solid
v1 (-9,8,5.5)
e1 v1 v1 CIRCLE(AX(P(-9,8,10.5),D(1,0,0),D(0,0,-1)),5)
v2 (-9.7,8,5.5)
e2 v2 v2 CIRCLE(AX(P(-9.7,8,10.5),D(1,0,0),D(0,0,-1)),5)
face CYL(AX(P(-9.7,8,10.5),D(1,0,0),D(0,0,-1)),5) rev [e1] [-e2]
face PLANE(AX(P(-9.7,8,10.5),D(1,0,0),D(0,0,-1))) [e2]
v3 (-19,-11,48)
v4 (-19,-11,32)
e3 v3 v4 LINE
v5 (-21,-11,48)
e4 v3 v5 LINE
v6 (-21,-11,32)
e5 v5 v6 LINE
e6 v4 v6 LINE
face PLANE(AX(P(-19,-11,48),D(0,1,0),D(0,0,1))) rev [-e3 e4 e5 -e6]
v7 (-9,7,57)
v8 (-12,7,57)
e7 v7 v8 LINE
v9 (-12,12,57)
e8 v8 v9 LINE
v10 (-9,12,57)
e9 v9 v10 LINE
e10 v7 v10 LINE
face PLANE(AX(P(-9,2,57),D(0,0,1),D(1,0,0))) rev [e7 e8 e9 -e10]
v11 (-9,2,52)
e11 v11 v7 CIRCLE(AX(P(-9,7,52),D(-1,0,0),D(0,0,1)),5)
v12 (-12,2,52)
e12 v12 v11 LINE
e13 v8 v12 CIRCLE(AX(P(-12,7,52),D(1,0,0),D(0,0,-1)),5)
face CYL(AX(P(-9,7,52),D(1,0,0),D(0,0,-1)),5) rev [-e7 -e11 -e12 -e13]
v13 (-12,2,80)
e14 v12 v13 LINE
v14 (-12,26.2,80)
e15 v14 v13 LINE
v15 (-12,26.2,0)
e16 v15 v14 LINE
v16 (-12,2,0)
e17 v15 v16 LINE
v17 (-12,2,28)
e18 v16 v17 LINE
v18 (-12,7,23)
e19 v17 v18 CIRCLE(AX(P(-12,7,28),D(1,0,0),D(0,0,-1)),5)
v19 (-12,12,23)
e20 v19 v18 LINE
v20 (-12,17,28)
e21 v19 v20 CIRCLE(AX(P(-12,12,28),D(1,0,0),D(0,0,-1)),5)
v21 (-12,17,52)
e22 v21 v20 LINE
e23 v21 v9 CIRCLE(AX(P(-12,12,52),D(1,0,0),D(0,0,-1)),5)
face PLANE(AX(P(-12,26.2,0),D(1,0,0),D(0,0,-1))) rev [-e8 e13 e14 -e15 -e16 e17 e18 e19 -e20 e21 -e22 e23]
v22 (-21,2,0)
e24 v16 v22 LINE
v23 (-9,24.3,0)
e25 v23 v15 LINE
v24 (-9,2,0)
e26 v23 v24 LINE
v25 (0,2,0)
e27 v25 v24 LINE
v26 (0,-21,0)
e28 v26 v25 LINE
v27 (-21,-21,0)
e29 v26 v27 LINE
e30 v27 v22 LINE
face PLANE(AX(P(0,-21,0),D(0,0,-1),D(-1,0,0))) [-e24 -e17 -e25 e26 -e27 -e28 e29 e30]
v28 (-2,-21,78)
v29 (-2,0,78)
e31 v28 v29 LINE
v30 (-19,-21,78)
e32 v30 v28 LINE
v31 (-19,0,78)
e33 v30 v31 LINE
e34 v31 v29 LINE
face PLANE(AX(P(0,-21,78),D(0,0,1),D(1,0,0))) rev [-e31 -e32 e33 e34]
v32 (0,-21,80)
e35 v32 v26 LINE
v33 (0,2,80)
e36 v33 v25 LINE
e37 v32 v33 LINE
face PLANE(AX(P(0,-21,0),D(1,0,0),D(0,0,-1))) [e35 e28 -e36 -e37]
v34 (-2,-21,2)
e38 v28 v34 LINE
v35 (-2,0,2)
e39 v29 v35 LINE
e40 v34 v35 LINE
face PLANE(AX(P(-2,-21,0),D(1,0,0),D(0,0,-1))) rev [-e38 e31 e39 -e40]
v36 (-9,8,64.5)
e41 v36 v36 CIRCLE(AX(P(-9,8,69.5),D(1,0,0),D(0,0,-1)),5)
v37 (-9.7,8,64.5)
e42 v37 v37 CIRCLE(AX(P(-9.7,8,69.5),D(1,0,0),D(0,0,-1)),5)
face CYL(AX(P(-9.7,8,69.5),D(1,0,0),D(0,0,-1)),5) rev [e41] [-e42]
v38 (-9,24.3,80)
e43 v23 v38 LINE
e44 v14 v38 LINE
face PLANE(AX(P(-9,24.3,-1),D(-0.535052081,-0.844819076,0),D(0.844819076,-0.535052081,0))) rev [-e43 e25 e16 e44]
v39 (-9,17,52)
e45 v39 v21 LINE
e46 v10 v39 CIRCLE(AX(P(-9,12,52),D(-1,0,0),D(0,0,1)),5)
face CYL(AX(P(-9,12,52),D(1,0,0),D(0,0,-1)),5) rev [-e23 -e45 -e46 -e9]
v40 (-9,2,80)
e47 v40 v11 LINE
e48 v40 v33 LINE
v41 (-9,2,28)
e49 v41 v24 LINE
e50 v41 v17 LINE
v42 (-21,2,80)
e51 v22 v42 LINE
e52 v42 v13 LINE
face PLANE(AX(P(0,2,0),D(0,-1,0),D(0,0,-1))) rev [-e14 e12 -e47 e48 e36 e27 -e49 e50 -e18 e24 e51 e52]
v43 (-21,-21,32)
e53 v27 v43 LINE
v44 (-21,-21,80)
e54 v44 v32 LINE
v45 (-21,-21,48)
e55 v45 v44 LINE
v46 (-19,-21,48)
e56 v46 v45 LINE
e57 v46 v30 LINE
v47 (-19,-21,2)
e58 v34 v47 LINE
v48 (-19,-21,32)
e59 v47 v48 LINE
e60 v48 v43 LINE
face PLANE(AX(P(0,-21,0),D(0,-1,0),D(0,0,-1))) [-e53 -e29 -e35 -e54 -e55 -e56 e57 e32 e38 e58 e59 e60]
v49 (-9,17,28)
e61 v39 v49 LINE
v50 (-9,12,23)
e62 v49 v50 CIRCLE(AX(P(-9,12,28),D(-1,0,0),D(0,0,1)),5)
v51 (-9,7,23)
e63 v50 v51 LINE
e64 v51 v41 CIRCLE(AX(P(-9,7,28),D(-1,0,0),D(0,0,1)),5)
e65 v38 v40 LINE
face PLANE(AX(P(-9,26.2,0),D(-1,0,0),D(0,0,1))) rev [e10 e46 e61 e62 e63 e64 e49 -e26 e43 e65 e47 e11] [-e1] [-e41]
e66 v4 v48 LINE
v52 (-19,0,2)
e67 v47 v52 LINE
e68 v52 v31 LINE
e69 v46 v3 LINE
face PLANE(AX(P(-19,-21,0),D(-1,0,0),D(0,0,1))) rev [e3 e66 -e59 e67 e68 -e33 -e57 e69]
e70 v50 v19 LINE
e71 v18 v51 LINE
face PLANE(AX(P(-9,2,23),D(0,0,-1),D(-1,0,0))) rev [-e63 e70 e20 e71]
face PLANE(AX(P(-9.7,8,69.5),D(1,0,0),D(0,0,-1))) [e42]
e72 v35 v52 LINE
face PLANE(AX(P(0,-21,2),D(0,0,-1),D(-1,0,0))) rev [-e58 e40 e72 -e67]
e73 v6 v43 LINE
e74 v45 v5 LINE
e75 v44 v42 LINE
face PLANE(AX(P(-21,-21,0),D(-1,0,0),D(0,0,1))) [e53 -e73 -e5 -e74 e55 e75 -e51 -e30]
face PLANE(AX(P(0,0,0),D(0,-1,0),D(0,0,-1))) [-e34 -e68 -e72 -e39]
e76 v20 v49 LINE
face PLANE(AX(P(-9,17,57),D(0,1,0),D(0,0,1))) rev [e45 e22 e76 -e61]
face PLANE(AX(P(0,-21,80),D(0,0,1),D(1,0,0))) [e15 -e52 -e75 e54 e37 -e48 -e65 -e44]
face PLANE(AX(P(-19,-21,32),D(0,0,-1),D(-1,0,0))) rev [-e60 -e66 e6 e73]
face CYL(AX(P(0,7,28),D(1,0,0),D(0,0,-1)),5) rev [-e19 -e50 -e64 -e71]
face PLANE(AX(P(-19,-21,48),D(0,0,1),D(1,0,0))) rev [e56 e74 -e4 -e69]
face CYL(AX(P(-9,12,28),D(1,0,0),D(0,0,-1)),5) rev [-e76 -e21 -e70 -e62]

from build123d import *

# Parameters (mm, degrees)
BOSS_EXTRU_1_DEPTH      = 2
BOSS_EXTRU_1_DEPTH_BACK = 21
ESQUISSE1_W             = 21
ESQUISSE1_H             = 80
ESQUISSE10_W            = 3
ESQUISSE10_H            = 80
BOSS_EXTRU_2_DEPTH      = 24.2
ESQUISSE11_W            = 34
ESQUISSE11_H            = 15
ENL_V_MAT_EXTRU_1_DEPTH = 3
CONG_1_R                = 5
ENL_V_MAT_EXTRU_2_DEPTH = 81
COQUE2_START            = -21
COQUE2_OUTLINE_W        = 17
COQUE2_OUTLINE_H        = 76
COQUE2_DEPTH            = 21
ESQUISSE15_W            = 16
ESQUISSE15_H            = 10
ENL_V_MAT_EXTRU_3_DEPTH = 2
ESQUISSE12_R            = 5
ENL_V_MAT_EXTRU_4_DEPTH = 0.7


# Read off the part's stored shape, not the designer's step: Coque2
with BuildPart() as part:
    # Esquisse1 → Boss.-Extru.1 (new, two sides: drawn at the far end of the back side and taken through both)
    with BuildSketch(Plane(origin=(0, 0, 0), x_dir=(1, 0, 0), z_dir=(0, 1, 0)).offset(-BOSS_EXTRU_1_DEPTH_BACK)):
        with Locations((-10.5, -40)):
            Rectangle(ESQUISSE1_W, ESQUISSE1_H)
    extrude(amount=BOSS_EXTRU_1_DEPTH + BOSS_EXTRU_1_DEPTH_BACK)

    # Esquisse10 → Boss.-Extru.2 (add)
    with BuildSketch(Plane(origin=(0, 2, 0), x_dir=(1, 0, 0), z_dir=(0, 1, 0))):
        with Locations((-10.5, -40)):
            Rectangle(ESQUISSE10_W, ESQUISSE10_H)
    extrude(amount=BOSS_EXTRU_2_DEPTH)

    # Esquisse11 → Enlèv. mat.-Extru.1 (cut)
    with BuildSketch(Plane.ZY.offset(12)):
        with Locations((40, 9.5)):
            Rectangle(ESQUISSE11_W, ESQUISSE11_H)
    extrude(amount=-ENL_V_MAT_EXTRU_1_DEPTH, mode=Mode.SUBTRACT)

    # Congé1
    cong_1_edges = [part.edges().sort_by_distance(p)[0] for p in [
        (-10.5, 17, 57),
        (-10.5, 2, 57),
        (-10.5, 2, 23),
        (-10.5, 17, 23),
    ]]
    fillet(cong_1_edges, radius=CONG_1_R)

    # Esquisse13 → Enlèv. mat.-Extru.2 (cut)
    with BuildSketch(Plane.XY.offset(80)):
        Polygon((-12, 26.2), (-9, 26.2), (-9, 24.3), align=None)
    extrude(amount=-ENL_V_MAT_EXTRU_2_DEPTH, mode=Mode.SUBTRACT)

    # Coque2 outline → Coque2 (cut)
    with BuildSketch(Plane(origin=(0, 0, 0), x_dir=(1, 0, 0), z_dir=(0, 1, 0)).offset(COQUE2_START)):
        with Locations((-10.5, -40)):
            Rectangle(COQUE2_OUTLINE_W, COQUE2_OUTLINE_H)
    extrude(amount=COQUE2_DEPTH, mode=Mode.SUBTRACT)

    # Esquisse15 → Enlèv. mat.-Extru.3 (cut)
    with BuildSketch(Plane.ZY.offset(21)):
        with Locations((40, -16)):
            Rectangle(ESQUISSE15_W, ESQUISSE15_H)
    extrude(amount=-ENL_V_MAT_EXTRU_3_DEPTH, mode=Mode.SUBTRACT)

    # Esquisse12 → Enlèv. mat.-Extru.4 (cut)
    with BuildSketch(Plane(origin=(-9, 0, 0), x_dir=(0, 0, -1), z_dir=(1, 0, 0))):
        with Locations((-69.5, 8)):
            Circle(ESQUISSE12_R)
        with Locations((-10.5, 8)):
            Circle(ESQUISSE12_R)
    extrude(amount=-ENL_V_MAT_EXTRU_4_DEPTH, mode=Mode.SUBTRACT)


solid = part.part
